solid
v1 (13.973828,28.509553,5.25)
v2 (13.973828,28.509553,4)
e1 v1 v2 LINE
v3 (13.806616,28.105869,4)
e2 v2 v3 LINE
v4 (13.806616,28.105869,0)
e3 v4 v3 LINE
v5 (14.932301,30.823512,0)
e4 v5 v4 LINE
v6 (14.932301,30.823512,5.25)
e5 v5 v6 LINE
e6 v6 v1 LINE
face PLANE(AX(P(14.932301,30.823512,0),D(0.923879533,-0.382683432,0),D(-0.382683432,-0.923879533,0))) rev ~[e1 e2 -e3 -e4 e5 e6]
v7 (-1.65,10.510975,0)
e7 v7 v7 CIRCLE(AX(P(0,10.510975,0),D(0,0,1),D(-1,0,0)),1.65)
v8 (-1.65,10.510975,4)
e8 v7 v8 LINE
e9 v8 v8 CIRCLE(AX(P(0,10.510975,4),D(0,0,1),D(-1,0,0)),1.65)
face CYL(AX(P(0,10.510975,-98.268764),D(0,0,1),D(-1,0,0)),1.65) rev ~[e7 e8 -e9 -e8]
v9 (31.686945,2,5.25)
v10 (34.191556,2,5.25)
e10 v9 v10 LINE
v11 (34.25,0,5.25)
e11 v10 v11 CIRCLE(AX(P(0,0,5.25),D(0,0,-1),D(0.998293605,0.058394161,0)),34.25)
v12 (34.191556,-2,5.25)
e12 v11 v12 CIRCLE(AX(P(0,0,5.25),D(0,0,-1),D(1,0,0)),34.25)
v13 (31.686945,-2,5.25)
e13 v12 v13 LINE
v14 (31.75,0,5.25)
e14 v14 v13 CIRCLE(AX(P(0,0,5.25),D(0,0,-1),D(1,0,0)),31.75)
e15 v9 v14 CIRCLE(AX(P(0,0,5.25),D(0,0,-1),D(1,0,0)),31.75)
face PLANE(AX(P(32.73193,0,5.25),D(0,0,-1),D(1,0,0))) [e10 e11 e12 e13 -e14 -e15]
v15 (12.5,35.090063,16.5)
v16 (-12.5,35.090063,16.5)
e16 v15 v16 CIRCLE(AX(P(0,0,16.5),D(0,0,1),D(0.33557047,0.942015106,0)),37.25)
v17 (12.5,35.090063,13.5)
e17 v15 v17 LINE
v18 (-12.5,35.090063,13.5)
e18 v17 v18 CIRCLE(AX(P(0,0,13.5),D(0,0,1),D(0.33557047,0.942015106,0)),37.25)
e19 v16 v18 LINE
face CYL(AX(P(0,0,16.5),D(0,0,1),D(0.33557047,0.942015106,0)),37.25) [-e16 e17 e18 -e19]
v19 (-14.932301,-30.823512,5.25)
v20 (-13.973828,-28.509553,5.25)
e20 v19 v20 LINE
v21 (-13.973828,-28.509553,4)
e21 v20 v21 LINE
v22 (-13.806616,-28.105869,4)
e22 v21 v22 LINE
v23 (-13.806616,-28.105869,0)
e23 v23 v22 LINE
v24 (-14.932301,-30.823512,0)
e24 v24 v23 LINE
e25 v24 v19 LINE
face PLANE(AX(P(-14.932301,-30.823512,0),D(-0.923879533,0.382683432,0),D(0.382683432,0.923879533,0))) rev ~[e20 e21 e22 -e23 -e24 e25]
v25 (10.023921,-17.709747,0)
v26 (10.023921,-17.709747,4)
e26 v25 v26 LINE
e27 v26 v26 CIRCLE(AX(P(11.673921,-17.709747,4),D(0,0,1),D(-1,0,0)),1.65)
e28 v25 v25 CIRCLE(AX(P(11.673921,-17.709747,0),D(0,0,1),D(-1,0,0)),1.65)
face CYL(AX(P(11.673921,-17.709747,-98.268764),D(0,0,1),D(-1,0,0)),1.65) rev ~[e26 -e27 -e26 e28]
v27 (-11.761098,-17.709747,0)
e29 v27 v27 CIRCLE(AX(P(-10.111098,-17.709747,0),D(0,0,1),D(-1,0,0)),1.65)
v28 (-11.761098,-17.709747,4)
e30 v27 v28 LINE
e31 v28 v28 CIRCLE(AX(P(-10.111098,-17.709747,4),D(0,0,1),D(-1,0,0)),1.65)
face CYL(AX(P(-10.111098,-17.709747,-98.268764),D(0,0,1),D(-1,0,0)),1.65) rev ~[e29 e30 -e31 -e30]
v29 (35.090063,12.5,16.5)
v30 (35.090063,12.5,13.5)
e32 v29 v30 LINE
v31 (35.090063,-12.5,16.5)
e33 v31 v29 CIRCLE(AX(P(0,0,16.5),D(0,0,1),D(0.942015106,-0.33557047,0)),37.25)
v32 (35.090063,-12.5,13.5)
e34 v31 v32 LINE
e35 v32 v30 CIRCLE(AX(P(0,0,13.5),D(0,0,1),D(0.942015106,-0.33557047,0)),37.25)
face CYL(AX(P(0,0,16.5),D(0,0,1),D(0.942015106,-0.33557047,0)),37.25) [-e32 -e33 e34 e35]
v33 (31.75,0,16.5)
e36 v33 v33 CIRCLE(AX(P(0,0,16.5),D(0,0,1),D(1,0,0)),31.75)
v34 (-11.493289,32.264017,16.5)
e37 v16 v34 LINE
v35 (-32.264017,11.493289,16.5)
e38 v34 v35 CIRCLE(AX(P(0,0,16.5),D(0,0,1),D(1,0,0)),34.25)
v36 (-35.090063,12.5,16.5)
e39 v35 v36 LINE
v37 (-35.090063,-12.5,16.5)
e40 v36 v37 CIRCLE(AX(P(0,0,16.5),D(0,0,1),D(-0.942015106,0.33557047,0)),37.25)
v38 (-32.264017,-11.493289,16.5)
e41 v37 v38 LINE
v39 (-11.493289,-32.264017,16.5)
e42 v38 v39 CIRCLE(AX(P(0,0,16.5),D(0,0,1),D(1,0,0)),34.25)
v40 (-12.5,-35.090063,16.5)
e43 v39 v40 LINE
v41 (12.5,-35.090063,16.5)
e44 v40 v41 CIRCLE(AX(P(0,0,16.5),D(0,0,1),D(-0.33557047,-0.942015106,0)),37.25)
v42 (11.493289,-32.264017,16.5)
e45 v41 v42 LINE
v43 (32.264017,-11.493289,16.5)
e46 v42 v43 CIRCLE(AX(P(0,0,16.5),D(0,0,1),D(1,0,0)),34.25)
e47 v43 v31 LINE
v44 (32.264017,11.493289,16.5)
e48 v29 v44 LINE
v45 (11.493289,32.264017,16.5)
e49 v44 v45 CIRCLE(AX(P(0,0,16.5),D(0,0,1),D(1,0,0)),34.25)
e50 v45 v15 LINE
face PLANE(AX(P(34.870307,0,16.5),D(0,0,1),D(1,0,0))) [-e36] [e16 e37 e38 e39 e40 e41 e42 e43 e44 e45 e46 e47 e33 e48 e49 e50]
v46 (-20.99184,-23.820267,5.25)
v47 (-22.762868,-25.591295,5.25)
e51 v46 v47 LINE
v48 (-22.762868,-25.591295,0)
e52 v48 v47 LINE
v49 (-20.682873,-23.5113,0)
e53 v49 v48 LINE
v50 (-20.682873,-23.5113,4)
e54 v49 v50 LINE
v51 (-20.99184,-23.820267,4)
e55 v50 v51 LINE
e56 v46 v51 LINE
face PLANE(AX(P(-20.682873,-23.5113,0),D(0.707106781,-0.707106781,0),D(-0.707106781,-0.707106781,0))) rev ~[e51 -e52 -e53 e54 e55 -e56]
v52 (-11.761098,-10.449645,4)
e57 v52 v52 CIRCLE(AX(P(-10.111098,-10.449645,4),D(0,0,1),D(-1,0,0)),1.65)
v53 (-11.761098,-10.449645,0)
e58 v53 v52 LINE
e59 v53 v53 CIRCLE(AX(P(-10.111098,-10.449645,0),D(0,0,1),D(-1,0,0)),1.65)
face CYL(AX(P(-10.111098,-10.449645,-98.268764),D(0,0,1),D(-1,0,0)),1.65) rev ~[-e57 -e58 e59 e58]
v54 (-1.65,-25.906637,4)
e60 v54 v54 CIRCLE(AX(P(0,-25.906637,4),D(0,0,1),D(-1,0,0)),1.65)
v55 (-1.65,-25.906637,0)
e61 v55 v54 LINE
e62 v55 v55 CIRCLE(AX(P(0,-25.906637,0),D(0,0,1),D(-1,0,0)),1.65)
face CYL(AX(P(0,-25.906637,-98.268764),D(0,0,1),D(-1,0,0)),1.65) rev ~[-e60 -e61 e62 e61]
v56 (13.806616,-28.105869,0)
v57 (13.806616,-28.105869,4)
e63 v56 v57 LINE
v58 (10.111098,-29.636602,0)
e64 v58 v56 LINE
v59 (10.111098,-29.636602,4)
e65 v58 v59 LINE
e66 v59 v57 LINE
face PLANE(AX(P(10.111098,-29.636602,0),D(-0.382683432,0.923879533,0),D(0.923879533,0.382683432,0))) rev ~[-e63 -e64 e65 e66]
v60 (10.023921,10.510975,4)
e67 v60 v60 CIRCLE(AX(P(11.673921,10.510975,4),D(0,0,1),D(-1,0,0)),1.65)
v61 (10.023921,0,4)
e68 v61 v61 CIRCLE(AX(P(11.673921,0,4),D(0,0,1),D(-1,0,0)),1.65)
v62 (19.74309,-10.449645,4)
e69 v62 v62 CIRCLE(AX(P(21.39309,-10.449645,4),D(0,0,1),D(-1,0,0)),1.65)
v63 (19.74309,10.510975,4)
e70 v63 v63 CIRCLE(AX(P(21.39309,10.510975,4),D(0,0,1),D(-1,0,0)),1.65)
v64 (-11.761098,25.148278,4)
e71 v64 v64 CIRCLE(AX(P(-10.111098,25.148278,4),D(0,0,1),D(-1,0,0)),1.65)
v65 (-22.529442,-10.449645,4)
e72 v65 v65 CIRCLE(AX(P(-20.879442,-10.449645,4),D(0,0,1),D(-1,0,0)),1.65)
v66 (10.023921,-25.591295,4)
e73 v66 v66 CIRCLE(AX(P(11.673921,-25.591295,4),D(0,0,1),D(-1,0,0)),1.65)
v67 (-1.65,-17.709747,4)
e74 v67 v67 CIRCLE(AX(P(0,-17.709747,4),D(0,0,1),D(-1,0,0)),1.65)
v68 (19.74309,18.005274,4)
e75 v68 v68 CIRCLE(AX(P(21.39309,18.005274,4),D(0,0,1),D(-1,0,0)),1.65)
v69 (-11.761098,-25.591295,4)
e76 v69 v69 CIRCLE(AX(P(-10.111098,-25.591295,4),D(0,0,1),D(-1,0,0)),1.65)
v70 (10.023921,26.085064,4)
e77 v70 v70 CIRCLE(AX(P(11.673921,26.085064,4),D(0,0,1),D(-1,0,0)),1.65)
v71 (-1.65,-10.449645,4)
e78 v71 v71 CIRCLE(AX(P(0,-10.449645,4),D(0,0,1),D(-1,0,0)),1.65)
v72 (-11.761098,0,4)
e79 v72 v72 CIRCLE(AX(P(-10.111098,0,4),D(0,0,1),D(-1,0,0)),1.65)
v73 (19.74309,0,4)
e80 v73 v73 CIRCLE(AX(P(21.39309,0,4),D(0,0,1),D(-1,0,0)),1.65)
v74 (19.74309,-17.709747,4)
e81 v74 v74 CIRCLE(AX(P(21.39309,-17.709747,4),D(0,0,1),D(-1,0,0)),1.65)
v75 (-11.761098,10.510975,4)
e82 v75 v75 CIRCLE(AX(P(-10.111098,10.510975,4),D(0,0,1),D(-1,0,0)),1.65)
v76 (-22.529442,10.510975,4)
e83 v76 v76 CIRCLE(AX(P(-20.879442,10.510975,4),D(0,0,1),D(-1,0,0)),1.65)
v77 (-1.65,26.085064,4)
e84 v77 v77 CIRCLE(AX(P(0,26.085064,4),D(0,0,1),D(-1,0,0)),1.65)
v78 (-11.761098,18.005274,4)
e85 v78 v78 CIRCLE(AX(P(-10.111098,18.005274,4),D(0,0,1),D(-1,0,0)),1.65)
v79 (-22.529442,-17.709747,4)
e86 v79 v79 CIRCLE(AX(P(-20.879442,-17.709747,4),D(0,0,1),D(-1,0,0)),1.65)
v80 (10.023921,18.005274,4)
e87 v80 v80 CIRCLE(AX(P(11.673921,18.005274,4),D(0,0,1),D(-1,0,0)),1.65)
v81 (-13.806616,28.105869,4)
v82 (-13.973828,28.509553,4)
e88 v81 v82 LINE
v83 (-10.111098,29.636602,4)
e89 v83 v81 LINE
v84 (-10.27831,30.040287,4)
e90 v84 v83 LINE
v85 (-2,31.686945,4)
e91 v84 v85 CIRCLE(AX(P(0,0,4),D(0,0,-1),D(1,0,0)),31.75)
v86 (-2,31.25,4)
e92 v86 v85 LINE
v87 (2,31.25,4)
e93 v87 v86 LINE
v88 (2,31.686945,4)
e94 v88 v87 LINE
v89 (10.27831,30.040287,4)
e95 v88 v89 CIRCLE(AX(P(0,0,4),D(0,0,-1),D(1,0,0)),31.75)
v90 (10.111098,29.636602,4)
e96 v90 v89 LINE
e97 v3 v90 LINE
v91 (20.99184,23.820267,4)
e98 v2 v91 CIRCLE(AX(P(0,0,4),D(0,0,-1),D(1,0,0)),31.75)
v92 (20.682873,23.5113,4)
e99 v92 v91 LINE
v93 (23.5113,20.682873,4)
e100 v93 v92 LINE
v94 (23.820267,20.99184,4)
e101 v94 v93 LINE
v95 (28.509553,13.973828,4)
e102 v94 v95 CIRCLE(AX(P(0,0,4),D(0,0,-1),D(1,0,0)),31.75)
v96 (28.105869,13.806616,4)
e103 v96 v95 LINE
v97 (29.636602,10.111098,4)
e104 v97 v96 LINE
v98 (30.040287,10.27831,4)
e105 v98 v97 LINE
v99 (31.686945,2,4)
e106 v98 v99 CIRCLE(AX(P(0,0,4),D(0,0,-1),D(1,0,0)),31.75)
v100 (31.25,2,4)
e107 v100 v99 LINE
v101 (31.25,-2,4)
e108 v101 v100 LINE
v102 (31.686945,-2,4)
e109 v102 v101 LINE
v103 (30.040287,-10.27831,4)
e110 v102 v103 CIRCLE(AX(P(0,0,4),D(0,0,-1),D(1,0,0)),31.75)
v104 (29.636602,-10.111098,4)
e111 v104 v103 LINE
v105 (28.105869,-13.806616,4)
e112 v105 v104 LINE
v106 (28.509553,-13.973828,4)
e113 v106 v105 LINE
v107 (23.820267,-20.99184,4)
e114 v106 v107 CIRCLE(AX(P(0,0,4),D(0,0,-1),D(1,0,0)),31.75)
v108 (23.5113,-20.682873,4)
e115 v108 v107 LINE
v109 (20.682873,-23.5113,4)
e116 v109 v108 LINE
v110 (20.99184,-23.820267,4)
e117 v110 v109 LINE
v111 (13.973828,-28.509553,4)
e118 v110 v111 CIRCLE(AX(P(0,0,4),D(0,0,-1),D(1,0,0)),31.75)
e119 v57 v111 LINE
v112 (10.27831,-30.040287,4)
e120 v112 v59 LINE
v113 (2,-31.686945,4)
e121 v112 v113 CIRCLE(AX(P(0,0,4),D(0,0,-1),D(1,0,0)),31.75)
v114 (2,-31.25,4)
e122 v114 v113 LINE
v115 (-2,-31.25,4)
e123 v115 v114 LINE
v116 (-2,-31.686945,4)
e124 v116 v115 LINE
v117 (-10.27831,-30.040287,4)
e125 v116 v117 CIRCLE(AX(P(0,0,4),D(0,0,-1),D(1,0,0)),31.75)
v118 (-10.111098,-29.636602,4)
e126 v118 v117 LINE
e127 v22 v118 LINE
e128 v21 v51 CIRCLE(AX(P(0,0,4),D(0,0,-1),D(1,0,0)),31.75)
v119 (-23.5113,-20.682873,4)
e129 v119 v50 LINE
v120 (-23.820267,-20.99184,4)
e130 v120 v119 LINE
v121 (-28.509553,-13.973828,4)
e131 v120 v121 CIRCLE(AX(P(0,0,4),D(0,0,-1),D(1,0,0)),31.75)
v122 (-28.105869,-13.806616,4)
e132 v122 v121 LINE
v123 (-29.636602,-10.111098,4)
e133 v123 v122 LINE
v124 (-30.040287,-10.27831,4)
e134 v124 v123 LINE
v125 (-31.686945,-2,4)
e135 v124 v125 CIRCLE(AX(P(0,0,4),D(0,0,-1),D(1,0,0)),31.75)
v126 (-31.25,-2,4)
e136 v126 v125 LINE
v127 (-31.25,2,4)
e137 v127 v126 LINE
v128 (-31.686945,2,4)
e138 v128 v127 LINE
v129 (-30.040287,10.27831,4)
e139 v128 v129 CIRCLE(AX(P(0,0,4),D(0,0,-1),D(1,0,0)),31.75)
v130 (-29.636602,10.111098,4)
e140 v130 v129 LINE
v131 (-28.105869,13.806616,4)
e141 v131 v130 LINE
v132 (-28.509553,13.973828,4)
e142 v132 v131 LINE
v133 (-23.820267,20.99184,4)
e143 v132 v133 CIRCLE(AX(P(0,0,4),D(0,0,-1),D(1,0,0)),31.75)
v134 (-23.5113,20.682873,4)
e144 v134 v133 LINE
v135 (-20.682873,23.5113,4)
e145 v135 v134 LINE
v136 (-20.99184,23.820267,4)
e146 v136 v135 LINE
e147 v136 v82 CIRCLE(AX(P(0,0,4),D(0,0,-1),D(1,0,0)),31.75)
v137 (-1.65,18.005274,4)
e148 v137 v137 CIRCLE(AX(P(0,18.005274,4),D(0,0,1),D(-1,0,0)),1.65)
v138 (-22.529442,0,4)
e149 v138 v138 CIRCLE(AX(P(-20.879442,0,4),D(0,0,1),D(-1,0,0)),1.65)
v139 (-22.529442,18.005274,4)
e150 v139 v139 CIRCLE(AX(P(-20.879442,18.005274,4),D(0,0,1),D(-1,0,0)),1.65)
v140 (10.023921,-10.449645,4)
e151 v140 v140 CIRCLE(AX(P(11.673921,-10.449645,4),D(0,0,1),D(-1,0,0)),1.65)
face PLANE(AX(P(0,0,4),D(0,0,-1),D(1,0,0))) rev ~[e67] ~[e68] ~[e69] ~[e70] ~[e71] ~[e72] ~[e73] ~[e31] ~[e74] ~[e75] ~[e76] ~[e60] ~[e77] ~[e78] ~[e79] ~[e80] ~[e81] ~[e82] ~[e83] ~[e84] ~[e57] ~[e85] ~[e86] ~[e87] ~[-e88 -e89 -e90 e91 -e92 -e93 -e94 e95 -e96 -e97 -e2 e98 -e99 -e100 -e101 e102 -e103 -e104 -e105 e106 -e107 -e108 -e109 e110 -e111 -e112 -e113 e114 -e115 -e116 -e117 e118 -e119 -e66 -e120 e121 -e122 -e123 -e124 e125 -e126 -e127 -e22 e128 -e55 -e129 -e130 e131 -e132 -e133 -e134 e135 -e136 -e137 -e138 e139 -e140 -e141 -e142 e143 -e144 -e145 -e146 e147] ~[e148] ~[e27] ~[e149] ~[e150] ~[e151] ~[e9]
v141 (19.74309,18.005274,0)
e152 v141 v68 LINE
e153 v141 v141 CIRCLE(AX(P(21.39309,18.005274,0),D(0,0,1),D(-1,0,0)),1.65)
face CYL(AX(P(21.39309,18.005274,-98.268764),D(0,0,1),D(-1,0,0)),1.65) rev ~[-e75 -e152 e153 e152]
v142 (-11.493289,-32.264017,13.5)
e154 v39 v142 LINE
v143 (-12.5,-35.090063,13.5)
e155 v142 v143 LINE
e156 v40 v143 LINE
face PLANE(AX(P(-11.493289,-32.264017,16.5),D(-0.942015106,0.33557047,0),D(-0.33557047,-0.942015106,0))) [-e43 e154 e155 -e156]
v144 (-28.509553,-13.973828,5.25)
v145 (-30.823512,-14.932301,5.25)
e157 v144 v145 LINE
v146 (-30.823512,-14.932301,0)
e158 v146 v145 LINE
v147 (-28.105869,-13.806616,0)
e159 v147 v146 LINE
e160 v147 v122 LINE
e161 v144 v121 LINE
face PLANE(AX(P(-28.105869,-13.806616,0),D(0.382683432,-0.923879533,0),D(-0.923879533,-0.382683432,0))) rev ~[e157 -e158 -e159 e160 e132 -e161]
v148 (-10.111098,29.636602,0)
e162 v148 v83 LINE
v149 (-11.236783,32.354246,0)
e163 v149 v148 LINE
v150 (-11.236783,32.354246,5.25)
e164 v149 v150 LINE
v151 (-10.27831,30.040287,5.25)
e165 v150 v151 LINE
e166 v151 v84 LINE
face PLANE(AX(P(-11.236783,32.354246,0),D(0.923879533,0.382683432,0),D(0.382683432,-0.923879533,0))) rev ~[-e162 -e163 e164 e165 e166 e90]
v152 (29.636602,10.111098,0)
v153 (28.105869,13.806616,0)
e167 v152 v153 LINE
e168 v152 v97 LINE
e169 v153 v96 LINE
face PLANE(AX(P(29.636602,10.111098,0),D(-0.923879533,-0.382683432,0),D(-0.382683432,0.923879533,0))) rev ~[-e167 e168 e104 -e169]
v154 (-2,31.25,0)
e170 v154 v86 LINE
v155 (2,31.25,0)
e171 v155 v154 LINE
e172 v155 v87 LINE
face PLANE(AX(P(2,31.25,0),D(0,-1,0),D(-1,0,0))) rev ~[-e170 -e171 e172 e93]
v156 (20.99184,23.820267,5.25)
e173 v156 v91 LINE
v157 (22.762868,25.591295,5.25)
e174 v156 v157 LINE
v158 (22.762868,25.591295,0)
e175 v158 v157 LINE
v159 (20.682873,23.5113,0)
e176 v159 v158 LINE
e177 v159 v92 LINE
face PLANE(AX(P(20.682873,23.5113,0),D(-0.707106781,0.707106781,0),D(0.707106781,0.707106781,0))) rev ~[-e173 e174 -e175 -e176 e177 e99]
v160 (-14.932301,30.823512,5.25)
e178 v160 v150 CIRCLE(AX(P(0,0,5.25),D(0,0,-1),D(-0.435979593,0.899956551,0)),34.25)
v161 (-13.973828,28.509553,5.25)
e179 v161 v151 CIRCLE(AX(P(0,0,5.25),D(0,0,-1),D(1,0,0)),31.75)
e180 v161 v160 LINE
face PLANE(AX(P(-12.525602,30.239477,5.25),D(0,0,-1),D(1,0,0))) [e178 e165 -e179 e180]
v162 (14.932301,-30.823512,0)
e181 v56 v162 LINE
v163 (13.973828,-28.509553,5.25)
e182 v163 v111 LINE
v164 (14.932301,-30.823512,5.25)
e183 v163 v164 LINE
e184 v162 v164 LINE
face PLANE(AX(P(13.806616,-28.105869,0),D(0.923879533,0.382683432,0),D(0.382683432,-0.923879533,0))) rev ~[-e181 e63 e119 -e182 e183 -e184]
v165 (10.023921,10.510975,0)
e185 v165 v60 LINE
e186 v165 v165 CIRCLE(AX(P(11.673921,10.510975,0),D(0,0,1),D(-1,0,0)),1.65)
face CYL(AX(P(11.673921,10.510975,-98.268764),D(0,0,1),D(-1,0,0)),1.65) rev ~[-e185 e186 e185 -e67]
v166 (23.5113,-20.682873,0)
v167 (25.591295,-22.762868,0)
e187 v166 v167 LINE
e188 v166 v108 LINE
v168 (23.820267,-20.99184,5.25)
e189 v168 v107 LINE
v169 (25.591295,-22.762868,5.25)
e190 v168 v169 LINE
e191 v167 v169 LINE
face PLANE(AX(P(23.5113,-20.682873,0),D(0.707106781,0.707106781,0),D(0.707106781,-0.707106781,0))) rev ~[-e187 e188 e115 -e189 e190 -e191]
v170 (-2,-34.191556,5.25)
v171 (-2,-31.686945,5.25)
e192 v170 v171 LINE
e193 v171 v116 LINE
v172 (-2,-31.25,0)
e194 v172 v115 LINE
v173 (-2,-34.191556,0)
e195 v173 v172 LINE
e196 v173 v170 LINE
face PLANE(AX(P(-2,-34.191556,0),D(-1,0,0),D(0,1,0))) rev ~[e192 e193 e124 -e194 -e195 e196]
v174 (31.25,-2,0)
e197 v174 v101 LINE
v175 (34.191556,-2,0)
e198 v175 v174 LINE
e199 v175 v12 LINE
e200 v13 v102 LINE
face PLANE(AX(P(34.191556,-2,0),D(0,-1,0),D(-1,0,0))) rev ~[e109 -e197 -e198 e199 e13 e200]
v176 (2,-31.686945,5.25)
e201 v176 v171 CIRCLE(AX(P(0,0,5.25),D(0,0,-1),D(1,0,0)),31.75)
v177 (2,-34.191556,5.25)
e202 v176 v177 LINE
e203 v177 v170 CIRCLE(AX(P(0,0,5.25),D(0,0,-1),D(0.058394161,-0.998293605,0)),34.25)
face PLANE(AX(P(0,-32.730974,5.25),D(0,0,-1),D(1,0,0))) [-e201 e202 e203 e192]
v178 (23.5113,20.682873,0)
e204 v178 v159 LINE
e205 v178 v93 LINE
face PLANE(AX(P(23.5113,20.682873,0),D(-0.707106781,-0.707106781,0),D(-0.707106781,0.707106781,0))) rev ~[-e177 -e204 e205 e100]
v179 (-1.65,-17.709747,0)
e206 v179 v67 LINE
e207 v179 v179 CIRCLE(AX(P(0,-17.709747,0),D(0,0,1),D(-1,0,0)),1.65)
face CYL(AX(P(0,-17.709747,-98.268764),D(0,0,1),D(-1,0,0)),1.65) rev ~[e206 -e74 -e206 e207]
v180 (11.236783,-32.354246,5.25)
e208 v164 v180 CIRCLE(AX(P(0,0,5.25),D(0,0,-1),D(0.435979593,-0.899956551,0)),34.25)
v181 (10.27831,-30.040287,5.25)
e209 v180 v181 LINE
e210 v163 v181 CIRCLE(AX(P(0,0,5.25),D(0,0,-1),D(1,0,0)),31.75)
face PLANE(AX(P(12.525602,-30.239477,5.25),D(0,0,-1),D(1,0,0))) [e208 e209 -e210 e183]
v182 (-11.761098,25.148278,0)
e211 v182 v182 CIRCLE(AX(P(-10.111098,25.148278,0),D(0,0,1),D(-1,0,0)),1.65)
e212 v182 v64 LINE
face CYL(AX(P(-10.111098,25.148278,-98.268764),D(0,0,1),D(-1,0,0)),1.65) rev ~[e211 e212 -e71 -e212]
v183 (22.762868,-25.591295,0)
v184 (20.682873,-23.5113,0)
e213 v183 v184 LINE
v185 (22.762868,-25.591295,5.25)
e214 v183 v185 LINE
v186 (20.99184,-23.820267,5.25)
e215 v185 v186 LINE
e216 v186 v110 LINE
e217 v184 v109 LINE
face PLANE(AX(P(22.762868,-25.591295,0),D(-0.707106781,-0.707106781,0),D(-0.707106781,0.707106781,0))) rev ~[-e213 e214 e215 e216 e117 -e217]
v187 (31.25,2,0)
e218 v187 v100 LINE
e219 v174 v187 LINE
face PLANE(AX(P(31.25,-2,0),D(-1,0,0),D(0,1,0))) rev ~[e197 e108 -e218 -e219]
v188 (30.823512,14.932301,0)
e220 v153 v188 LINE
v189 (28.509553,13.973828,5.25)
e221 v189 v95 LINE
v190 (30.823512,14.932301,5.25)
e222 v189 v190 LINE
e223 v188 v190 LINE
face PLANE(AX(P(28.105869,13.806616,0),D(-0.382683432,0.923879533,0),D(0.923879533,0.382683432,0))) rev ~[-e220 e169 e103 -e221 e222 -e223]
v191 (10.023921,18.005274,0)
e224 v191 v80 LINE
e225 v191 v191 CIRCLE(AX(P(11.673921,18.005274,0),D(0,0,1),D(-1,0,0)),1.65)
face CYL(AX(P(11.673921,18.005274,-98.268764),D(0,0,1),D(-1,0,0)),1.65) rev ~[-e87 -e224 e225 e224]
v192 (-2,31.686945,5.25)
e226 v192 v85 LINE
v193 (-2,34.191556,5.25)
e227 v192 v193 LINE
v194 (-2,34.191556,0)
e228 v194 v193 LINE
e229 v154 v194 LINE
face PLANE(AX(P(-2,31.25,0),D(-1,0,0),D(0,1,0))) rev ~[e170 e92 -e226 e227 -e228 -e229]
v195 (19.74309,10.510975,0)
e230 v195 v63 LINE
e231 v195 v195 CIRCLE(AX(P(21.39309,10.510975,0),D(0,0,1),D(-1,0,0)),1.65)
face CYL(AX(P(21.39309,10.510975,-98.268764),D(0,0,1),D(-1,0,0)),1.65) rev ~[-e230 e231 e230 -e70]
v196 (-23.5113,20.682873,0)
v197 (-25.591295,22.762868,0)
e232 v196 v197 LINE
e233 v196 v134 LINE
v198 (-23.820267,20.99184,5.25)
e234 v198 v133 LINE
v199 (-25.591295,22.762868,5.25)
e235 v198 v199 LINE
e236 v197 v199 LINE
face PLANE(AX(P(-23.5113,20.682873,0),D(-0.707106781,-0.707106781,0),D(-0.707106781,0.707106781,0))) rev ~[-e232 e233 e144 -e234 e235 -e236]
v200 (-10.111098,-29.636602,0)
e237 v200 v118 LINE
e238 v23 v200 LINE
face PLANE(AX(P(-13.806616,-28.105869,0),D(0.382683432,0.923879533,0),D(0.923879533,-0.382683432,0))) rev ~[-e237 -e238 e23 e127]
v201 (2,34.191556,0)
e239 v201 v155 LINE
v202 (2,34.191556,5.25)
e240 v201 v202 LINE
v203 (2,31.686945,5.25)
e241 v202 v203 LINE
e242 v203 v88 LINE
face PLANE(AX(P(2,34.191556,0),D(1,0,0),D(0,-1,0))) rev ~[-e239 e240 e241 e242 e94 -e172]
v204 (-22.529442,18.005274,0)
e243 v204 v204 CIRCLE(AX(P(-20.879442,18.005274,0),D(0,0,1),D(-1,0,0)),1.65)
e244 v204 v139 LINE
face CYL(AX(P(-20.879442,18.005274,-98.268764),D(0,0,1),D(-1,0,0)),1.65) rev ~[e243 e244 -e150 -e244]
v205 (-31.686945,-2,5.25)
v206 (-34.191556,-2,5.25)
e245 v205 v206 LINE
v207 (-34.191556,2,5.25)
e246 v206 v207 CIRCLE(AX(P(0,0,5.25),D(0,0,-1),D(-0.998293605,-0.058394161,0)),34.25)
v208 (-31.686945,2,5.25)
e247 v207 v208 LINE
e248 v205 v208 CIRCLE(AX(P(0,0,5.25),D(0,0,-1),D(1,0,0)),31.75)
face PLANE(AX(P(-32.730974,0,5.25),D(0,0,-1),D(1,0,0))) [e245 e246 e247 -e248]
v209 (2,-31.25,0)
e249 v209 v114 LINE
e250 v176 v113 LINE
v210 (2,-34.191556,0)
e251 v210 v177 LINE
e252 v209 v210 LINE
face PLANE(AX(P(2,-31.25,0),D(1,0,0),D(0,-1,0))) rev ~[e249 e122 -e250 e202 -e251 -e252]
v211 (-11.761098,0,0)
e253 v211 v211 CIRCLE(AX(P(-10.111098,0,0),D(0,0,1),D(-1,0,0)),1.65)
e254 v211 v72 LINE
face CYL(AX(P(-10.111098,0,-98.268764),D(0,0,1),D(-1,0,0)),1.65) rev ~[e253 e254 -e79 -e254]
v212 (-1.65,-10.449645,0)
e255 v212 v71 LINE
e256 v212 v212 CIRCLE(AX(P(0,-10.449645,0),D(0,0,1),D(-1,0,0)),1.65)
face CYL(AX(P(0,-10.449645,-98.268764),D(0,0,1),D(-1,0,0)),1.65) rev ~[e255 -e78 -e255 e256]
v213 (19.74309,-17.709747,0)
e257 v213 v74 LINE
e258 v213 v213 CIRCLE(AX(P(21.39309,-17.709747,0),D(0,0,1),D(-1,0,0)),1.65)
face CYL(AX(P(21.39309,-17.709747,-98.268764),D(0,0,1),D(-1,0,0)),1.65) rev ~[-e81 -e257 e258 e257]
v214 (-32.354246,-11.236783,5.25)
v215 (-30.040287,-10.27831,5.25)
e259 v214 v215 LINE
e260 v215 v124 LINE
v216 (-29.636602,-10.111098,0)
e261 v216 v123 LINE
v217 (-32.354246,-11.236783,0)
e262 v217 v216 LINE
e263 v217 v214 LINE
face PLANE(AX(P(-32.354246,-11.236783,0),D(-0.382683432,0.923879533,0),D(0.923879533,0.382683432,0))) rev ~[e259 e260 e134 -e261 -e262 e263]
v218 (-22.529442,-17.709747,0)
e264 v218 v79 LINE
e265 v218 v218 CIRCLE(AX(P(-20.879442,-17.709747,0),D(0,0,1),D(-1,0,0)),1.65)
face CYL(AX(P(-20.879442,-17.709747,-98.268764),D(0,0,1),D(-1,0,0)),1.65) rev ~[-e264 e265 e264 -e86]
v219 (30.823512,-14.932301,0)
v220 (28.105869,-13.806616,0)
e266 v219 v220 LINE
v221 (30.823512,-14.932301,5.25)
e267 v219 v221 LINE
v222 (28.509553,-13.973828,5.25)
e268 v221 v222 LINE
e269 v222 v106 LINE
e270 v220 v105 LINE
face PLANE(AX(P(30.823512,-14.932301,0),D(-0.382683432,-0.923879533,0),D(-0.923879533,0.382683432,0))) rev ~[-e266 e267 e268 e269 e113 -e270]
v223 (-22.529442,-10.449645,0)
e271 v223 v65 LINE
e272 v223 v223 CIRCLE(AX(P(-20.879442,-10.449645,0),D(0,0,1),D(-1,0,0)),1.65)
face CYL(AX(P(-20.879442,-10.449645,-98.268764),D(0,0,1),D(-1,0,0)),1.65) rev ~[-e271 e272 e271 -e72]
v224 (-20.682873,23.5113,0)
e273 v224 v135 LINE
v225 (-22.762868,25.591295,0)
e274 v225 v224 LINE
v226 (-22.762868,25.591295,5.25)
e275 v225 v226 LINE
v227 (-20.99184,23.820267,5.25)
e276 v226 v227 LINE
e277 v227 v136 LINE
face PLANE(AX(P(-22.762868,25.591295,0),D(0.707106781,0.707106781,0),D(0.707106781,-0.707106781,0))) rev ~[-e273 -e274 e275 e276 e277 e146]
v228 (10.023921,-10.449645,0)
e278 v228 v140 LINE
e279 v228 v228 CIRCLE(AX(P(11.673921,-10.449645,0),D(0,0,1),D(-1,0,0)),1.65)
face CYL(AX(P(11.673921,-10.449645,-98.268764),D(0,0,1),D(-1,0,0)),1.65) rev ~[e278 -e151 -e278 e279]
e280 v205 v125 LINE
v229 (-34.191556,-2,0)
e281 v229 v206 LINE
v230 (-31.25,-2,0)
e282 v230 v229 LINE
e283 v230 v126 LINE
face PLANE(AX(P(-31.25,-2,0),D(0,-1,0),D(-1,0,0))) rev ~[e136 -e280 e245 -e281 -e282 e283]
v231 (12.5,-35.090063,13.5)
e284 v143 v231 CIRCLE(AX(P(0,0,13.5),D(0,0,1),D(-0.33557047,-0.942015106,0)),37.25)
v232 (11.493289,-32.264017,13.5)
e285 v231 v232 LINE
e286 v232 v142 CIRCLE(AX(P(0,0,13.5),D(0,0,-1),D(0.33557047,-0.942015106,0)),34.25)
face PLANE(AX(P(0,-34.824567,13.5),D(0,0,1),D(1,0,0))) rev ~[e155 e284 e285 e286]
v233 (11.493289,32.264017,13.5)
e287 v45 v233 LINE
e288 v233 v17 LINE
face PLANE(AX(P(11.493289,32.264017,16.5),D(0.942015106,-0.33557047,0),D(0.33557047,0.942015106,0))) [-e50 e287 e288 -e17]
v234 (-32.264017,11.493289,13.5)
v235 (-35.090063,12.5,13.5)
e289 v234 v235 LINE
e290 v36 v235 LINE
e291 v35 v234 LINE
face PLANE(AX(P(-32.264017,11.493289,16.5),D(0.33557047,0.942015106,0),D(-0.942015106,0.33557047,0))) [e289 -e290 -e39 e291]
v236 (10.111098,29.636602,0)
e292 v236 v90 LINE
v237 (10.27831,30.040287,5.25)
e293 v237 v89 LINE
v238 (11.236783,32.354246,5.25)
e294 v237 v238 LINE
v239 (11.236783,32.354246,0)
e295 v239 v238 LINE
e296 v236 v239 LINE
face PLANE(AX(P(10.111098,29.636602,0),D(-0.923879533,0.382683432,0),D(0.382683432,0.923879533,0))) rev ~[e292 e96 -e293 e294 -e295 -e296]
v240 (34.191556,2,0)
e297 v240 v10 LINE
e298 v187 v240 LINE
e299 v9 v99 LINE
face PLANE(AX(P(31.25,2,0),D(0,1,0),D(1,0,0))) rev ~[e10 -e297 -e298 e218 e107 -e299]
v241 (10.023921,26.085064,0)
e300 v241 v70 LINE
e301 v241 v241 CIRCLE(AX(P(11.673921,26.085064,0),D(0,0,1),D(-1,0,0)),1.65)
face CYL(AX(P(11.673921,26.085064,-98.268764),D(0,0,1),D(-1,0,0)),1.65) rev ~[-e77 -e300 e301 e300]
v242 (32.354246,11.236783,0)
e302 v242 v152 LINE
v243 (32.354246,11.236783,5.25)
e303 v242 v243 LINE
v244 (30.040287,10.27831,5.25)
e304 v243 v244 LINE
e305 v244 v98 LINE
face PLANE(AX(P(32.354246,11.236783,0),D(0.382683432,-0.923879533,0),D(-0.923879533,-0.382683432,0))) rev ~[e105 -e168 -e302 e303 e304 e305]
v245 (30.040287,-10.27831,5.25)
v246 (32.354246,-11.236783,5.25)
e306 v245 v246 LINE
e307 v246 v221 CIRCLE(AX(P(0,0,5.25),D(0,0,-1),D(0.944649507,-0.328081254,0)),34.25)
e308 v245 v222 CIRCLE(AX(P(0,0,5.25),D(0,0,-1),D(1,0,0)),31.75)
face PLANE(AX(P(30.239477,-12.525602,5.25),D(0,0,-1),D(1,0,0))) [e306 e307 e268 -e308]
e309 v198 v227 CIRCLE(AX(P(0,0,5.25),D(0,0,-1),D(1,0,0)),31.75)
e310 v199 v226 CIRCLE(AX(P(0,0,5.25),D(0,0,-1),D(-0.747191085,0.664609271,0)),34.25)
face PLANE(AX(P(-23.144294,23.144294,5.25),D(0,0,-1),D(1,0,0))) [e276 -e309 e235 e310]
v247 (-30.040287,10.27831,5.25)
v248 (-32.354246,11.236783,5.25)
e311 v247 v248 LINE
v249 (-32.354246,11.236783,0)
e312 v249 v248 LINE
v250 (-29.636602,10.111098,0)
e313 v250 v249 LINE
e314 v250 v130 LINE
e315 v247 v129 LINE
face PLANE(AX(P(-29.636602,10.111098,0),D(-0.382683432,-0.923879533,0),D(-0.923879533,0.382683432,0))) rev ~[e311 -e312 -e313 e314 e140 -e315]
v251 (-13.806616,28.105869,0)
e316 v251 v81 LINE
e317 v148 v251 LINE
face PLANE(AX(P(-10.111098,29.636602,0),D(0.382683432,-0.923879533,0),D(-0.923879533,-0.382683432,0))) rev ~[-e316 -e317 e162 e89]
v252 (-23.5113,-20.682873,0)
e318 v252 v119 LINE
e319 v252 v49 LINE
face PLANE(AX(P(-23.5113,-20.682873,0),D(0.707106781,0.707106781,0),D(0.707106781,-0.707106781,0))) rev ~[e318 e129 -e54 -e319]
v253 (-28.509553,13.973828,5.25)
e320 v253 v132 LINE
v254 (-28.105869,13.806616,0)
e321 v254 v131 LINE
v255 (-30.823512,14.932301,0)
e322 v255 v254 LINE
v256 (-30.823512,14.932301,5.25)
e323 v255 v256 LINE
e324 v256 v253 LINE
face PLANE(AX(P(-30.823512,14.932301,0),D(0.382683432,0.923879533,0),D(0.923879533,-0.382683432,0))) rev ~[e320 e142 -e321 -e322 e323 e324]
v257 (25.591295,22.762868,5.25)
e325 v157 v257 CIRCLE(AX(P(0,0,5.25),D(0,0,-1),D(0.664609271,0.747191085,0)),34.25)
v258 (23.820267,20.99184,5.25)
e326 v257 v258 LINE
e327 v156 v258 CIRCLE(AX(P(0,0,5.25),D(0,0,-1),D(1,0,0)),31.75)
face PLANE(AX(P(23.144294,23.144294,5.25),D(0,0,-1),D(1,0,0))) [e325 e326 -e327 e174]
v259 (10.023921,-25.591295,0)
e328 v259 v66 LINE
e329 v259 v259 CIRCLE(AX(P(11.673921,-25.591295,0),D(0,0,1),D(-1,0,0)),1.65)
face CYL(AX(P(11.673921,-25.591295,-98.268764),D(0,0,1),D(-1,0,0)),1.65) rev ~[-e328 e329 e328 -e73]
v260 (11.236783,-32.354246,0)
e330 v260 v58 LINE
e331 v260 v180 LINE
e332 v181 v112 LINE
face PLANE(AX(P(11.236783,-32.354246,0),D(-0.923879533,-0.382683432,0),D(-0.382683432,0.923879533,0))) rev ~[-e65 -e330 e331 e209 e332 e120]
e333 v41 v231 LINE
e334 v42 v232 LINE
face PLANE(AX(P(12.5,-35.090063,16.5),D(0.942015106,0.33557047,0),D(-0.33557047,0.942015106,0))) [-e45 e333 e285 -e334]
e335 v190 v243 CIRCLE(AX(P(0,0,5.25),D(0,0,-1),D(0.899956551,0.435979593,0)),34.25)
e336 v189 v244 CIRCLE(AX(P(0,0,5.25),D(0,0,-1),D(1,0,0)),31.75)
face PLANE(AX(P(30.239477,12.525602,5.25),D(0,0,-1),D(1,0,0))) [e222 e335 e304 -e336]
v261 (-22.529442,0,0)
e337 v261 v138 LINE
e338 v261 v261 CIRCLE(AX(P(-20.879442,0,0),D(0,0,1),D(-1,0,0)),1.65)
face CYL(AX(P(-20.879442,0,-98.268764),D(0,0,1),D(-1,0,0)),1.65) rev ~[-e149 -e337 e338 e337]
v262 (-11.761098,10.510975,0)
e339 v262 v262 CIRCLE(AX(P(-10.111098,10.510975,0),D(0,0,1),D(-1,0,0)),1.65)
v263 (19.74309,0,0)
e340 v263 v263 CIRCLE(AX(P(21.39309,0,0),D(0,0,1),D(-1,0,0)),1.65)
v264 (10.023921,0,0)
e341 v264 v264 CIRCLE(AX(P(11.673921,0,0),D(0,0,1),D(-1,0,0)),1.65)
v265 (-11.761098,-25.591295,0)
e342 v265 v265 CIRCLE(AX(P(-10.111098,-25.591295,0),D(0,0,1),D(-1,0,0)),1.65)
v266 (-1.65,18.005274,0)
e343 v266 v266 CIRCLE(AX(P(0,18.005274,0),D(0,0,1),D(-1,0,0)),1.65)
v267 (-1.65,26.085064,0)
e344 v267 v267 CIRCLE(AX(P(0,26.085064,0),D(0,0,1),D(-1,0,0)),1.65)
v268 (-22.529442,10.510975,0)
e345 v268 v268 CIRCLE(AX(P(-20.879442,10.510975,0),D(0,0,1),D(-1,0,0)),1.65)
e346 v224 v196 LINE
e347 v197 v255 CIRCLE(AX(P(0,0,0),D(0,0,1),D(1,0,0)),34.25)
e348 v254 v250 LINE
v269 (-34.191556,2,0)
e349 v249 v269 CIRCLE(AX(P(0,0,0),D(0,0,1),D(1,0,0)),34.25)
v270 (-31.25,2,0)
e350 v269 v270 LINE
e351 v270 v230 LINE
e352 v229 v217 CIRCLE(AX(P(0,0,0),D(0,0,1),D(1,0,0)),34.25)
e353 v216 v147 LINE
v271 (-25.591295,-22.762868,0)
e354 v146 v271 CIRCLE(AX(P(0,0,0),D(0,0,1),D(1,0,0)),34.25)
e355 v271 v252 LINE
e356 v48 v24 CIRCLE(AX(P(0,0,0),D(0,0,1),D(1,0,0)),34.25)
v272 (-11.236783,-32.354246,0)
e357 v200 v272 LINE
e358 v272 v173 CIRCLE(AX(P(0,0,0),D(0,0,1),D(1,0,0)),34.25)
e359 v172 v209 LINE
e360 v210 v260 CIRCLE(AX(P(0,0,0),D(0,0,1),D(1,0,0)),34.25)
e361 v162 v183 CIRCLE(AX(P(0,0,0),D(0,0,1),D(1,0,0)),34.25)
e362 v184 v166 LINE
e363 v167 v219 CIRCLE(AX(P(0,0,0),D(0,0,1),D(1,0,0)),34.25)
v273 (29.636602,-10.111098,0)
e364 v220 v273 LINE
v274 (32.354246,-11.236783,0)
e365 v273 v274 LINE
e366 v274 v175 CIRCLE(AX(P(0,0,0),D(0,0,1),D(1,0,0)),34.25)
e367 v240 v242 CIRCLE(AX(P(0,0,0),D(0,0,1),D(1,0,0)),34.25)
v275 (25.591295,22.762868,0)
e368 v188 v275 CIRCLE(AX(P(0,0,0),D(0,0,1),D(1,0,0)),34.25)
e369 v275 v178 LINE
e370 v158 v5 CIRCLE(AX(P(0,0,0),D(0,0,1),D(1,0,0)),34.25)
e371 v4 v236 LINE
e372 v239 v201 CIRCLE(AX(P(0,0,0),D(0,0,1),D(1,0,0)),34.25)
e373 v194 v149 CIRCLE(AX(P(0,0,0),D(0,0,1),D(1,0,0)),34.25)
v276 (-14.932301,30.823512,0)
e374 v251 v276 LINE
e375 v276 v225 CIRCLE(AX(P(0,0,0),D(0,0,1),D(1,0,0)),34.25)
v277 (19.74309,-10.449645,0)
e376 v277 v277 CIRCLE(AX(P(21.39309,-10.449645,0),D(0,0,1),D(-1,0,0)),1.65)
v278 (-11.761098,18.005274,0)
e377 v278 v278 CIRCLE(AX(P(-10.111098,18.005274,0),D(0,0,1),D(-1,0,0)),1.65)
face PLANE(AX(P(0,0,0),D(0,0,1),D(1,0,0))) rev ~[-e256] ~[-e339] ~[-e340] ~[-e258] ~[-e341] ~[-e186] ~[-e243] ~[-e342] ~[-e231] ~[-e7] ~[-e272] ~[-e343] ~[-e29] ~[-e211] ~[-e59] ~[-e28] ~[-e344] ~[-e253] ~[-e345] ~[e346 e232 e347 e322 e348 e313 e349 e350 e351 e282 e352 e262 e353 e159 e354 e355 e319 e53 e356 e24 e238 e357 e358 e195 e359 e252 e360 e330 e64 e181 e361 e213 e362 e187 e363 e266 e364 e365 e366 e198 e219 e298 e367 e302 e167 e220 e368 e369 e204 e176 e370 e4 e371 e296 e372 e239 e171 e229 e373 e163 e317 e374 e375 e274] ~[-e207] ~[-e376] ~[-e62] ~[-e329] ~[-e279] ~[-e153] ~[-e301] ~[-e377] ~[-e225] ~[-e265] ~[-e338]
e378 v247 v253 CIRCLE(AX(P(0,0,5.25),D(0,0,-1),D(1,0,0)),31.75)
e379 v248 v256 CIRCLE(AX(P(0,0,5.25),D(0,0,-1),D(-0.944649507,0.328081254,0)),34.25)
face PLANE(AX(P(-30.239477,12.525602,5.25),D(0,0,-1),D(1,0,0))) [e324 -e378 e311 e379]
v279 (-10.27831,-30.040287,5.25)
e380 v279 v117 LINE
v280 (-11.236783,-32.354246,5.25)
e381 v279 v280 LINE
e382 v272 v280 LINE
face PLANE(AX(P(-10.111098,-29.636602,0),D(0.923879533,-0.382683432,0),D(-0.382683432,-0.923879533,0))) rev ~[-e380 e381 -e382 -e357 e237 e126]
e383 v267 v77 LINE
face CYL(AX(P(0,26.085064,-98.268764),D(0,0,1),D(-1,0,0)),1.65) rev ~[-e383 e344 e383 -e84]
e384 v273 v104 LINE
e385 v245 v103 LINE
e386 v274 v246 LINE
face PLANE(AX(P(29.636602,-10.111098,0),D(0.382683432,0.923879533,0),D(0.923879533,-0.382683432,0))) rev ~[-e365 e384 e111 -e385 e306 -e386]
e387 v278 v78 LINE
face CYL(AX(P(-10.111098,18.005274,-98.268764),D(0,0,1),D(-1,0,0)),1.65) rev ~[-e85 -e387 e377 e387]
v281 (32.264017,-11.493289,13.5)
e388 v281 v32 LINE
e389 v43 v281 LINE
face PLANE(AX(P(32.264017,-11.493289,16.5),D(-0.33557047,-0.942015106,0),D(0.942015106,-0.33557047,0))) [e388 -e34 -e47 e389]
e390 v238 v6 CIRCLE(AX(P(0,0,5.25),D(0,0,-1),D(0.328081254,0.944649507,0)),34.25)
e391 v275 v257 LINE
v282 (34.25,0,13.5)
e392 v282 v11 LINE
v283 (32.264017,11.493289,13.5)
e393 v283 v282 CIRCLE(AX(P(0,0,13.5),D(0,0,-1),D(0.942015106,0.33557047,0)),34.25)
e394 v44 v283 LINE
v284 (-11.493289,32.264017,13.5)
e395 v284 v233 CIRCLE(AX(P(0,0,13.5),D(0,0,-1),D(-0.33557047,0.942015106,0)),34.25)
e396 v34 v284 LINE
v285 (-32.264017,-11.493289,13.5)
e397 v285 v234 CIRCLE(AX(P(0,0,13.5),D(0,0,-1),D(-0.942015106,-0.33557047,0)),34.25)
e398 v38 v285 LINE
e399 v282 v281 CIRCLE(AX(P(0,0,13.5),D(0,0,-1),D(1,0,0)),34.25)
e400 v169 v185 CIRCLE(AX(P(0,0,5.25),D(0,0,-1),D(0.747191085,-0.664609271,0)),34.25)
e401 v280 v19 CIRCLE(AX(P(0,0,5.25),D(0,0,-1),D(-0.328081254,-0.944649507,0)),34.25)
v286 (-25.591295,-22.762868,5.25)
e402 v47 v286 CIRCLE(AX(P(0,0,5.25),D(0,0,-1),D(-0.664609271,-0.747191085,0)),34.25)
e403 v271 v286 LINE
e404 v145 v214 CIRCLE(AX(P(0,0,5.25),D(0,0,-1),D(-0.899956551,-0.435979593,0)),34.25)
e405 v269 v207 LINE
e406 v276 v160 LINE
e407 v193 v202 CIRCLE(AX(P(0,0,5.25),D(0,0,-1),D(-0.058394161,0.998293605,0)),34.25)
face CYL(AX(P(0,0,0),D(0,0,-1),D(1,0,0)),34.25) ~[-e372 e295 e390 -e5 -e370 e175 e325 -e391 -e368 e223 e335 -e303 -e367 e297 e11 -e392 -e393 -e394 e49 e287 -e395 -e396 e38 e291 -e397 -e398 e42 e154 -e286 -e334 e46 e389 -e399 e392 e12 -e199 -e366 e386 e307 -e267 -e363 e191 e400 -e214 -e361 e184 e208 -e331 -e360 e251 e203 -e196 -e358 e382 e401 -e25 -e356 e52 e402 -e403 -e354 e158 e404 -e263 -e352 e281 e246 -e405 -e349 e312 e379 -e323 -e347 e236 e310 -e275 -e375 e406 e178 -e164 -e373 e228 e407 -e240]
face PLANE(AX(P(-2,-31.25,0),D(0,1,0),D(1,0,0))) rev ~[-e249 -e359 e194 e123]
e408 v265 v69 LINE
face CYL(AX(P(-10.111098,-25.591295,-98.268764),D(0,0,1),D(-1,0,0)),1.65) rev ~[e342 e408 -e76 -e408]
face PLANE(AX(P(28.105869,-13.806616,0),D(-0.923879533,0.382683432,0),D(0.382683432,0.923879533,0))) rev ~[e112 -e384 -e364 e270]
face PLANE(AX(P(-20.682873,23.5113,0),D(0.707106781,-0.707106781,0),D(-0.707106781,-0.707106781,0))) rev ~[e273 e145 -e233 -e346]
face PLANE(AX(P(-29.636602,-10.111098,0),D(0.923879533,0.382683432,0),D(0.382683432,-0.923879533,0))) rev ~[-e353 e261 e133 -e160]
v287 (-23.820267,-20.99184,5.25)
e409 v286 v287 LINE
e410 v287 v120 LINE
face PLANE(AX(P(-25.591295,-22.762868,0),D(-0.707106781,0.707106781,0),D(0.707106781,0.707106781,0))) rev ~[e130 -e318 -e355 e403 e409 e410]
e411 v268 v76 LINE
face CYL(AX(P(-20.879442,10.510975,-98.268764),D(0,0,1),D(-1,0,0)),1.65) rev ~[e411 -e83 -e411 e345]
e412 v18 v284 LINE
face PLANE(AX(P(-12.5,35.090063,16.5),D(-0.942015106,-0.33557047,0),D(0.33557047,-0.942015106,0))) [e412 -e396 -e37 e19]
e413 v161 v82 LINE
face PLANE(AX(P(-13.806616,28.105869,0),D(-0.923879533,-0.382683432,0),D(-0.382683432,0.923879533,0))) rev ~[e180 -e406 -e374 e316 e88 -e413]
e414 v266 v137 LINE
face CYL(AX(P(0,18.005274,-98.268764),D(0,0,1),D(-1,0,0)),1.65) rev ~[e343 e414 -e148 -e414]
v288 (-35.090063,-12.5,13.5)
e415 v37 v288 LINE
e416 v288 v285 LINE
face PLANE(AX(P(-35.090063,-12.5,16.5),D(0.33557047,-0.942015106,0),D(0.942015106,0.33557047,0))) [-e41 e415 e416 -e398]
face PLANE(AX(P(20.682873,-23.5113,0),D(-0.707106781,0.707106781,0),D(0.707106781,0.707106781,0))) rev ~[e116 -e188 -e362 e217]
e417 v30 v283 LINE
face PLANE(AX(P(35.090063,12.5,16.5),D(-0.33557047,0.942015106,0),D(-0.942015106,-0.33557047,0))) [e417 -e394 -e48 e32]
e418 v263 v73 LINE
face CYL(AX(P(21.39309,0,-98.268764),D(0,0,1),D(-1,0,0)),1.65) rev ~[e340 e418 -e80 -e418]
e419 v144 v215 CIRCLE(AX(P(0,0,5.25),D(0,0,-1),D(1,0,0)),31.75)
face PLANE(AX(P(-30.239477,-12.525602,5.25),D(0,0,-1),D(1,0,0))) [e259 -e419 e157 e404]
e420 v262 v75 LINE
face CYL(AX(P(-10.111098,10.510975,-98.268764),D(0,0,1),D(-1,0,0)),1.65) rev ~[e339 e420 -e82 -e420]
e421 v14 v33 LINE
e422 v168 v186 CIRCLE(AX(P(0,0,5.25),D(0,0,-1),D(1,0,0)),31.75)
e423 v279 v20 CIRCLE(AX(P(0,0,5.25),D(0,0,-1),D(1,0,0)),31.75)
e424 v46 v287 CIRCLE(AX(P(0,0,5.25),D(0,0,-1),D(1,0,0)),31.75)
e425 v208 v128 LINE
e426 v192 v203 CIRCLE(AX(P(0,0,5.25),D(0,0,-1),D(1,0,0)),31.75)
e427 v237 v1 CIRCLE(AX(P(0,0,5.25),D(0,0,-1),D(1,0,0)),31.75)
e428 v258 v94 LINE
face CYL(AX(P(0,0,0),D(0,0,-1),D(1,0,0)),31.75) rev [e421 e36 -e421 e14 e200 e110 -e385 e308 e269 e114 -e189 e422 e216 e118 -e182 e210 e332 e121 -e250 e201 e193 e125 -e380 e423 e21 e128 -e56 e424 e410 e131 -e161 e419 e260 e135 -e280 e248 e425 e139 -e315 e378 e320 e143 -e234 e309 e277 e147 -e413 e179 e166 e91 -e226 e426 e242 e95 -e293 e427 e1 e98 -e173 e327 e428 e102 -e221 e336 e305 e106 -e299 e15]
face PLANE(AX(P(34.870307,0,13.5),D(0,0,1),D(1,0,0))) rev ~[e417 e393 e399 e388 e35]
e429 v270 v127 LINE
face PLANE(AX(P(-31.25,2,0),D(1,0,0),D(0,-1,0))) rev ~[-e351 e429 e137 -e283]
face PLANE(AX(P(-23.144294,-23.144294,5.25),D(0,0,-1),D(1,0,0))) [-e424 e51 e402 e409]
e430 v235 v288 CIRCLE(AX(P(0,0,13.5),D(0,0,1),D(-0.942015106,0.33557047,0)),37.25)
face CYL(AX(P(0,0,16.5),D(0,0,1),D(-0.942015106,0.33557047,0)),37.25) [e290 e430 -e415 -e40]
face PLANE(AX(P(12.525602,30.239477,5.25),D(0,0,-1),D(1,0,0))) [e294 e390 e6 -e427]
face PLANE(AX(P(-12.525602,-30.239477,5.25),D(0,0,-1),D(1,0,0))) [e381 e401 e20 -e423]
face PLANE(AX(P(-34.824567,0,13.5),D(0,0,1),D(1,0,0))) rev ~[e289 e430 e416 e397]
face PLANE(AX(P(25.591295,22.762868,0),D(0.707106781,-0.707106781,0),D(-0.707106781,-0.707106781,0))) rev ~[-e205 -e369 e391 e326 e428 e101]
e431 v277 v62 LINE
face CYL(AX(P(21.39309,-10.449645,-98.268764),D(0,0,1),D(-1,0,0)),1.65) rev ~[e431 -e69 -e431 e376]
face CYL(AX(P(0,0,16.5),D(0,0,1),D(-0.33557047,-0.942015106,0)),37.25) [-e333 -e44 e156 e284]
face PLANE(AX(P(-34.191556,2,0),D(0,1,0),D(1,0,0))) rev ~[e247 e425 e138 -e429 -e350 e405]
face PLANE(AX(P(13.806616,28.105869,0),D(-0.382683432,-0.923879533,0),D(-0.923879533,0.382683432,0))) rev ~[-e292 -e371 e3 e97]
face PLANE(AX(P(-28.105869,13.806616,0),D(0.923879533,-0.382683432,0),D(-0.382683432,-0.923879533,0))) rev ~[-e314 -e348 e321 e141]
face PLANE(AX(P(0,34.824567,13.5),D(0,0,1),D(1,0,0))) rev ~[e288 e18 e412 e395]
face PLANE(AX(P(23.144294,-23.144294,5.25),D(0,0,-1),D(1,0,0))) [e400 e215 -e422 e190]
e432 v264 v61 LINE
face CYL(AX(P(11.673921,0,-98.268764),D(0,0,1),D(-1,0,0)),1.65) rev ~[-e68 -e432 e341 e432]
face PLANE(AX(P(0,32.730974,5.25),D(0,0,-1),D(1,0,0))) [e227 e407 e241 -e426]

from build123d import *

# Parameters (mm, degrees)
F0_R     = 34.25
F0_R_2   = 31.75
F1_DEPTH = 16.5
F2_R     = 34.25
F2_R_2   = 31.75
F3_DEPTH = 4
F5_DEPTH = 5.25
F7_D     = 3.3
F9_DEPTH = 3


with BuildPart() as f1:
    # F0 (on Top) → F1 (new body)
    with BuildSketch(Plane.XY):
        Circle(F0_R)
        Circle(F0_R_2, mode=Mode.SUBTRACT)
    extrude(amount=F1_DEPTH)

    # F2 (on face) → F3 (join)
    with BuildSketch(Plane(origin=(0, 0, 0), x_dir=(1, 0, 0), z_dir=(0, 0, -1))):
        Circle(F2_R)
        Circle(F2_R_2, mode=Mode.SUBTRACT)
        Circle(F2_R_2)
    extrude(amount=-F3_DEPTH)

    # F4 (on face) → F5 (cut)
    with BuildSketch(Plane(origin=(0, 0, 0), x_dir=(1, 0, 0), z_dir=(0, 0, -1))):
        with BuildLine():
            ThreePointArc((25.5912946517, 22.762867527), (24.2184072556, 24.2184072556), (22.762867527, 25.5912946517))
            Line((22.762867527, 25.5912946517), (20.6828733497, 23.5113004745))
            Line((20.6828733497, 23.5113004745), (23.5113004745, 20.6828733497))
            Line((23.5113004745, 20.6828733497), (25.5912946517, 22.762867527))
        make_face()
        with BuildLine():
            ThreePointArc((14.9323010635, 30.8235118854), (13.1069075585, 31.6428739885), (11.2367829334, 32.3542456149))
            Line((11.2367829334, 32.3542456149), (10.1110981964, 29.6366022557))
            Line((10.1110981964, 29.6366022557), (13.8066163264, 28.1058685262))
            Line((13.8066163264, 28.1058685262), (14.9323010635, 30.8235118854))
        make_face()
        with BuildLine():
            ThreePointArc((2, 34.1915559751), (0, 34.25), (-2, 34.1915559751))
            Line((-2, 34.1915559751), (-2, 31.25))
            Line((-2, 31.25), (2, 31.25))
            Line((2, 31.25), (2, 34.1915559751))
        make_face()
        with BuildLine():
            Line((-10.1110981964, 29.6366022557), (-11.2367829334, 32.3542456149))
            ThreePointArc((-11.2367829334, 32.3542456149), (-13.1069075585, 31.6428739885), (-14.9323010635, 30.8235118854))
            Line((-14.9323010635, 30.8235118854), (-13.8066163264, 28.1058685262))
            Line((-13.8066163264, 28.1058685262), (-10.1110981964, 29.6366022557))
        make_face()
        with BuildLine():
            Line((-20.6828733497, 23.5113004745), (-22.762867527, 25.5912946517))
            ThreePointArc((-22.762867527, 25.5912946517), (-24.2184072556, 24.2184072556), (-25.5912946517, 22.762867527))
            Line((-25.5912946517, 22.762867527), (-23.5113004745, 20.6828733497))
            Line((-23.5113004745, 20.6828733497), (-20.6828733497, 23.5113004745))
        make_face()
        with BuildLine():
            Line((-31.25, 2), (-34.1915559751, 2))
            ThreePointArc((-34.1915559751, 2), (-34.25, 0), (-34.1915559751, -2))
            Line((-34.1915559751, -2), (-31.25, -2))
            Line((-31.25, -2), (-31.25, 2))
        make_face()
        with BuildLine():
            Line((-29.6366022557, -10.1110981964), (-32.3542456149, -11.2367829334))
            ThreePointArc((-32.3542456149, -11.2367829334), (-31.6428739885, -13.1069075585), (-30.8235118854, -14.9323010635))
            Line((-30.8235118854, -14.9323010635), (-28.1058685262, -13.8066163264))
            Line((-28.1058685262, -13.8066163264), (-29.6366022557, -10.1110981964))
        make_face()
        with BuildLine():
            Line((-23.5113004745, -20.6828733497), (-25.5912946517, -22.762867527))
            ThreePointArc((-25.5912946517, -22.762867527), (-24.2184072556, -24.2184072556), (-22.762867527, -25.5912946517))
            Line((-22.762867527, -25.5912946517), (-20.6828733497, -23.5113004745))
            Line((-20.6828733497, -23.5113004745), (-23.5113004745, -20.6828733497))
        make_face()
        with BuildLine():
            Line((-13.8066163264, -28.1058685262), (-14.9323010635, -30.8235118854))
            ThreePointArc((-14.9323010635, -30.8235118854), (-13.1069075585, -31.6428739885), (-11.2367829334, -32.3542456149))
            Line((-11.2367829334, -32.3542456149), (-10.1110981964, -29.6366022557))
            Line((-10.1110981964, -29.6366022557), (-13.8066163264, -28.1058685262))
        make_face()
        with BuildLine():
            Line((-2, -31.25), (-2, -34.1915559751))
            ThreePointArc((-2, -34.1915559751), (0, -34.25), (2, -34.1915559751))
            Line((2, -34.1915559751), (2, -31.25))
            Line((2, -31.25), (-2, -31.25))
        make_face()
        with BuildLine():
            ThreePointArc((11.2367829334, -32.3542456149), (13.1069075585, -31.6428739885), (14.9323010635, -30.8235118854))
            Line((14.9323010635, -30.8235118854), (13.8066163264, -28.1058685262))
            Line((13.8066163264, -28.1058685262), (10.1110981964, -29.6366022557))
            Line((10.1110981964, -29.6366022557), (11.2367829334, -32.3542456149))
        make_face()
        with BuildLine():
            ThreePointArc((30.8235118854, -14.9323010635), (31.6428739885, -13.1069075585), (32.3542456149, -11.2367829334))
            Line((32.3542456149, -11.2367829334), (29.6366022557, -10.1110981964))
            Line((29.6366022557, -10.1110981964), (28.1058685262, -13.8066163264))
            Line((28.1058685262, -13.8066163264), (30.8235118854, -14.9323010635))
        make_face()
        with BuildLine():
            ThreePointArc((22.762867527, -25.5912946517), (24.2184072556, -24.2184072556), (25.5912946517, -22.762867527))
            Line((25.5912946517, -22.762867527), (23.5113004745, -20.6828733497))
            Line((23.5113004745, -20.6828733497), (20.6828733497, -23.5113004745))
            Line((20.6828733497, -23.5113004745), (22.762867527, -25.5912946517))
        make_face()
        with BuildLine():
            ThreePointArc((34.25, 0), (34.2353858759, 1.0004268719), (34.1915559751, 2))
            Line((34.1915559751, 2), (31.25, 2))
            Line((31.25, 2), (31.25, -2))
            Line((31.25, -2), (34.1915559751, -2))
            ThreePointArc((34.1915559751, -2), (34.2353858759, -1.0004268719), (34.25, 0))
        make_face()
        with BuildLine():
            ThreePointArc((32.3542456149, 11.2367829334), (31.6428739885, 13.1069075585), (30.8235118854, 14.9323010635))
            Line((30.8235118854, 14.9323010635), (28.1058685262, 13.8066163264))
            Line((28.1058685262, 13.8066163264), (29.6366022557, 10.1110981964))
            Line((29.6366022557, 10.1110981964), (32.3542456149, 11.2367829334))
        make_face()
        with BuildLine():
            Line((-28.1058685262, 13.8066163264), (-30.8235118854, 14.9323010635))
            ThreePointArc((-30.8235118854, 14.9323010635), (-31.6428739885, 13.1069075585), (-32.3542456149, 11.2367829334))
            Line((-32.3542456149, 11.2367829334), (-29.6366022557, 10.1110981964))
            Line((-29.6366022557, 10.1110981964), (-28.1058685262, 13.8066163264))
        make_face()
    extrude(amount=-F5_DEPTH, mode=Mode.SUBTRACT)

    # F7 (through all)
    with Locations(Plane(origin=(0, 0, 0), x_dir=(1, 0, 0), z_dir=(0, 0, -1))):
        with Locations((-10.1110981964, 0), (-10.1110981964, 10.4496451095), (-10.1110981964, 17.7097469568), (-20.8794418722, 17.7097469568), (-20.8794418722, 10.4496451095), (-20.8794418722, 0), (-20.8794418722, -10.5109745637), (-20.8794418722, -18.0052742362), (-10.1110981964, -25.1482781023), (-10.1110981964, -18.0052742362), (-10.1110981964, -10.5109745637), (0, -18.0052742362), (0, -10.5109745637), (0, -26.0850638151), (0, 10.4496451095), (0, 17.7097469568), (-10.1110981964, 25.5912946517), (11.6739207879, 25.5912946517), (0, 25.906637311), (11.6739207879, 17.7097469568), (11.6739207879, 10.4496451095), (11.6739207879, 0), (11.6739207879, -10.5109745637), (11.6739207879, -26.0850638151), (21.3930904865, -18.0052742362), (11.6739207879, -18.0052742362), (21.3930904865, -10.5109745637), (21.3930904865, 0), (21.3930904865, 10.4496451095), (21.3930904865, 17.7097469568)):
            Hole(F7_D / 2)

    # F8 (on face) → F9 (join)
    with BuildSketch(Plane.XY.offset(16.5)):
        with BuildLine():
            ThreePointArc((-32.2640173781, -11.4932885906), (-34.25, 0), (-32.2640173781, 11.4932885906))
            Line((-32.2640173781, 11.4932885906), (-35.0900626959, 12.5))
            ThreePointArc((-35.0900626959, 12.5), (-37.25, 0), (-35.0900626959, -12.5))
            Line((-35.0900626959, -12.5), (-32.2640173781, -11.4932885906))
        make_face()
        with BuildLine():
            Line((11.4932885906, 32.2640173781), (12.5, 35.0900626959))
            ThreePointArc((12.5, 35.0900626959), (0, 37.25), (-12.5, 35.0900626959))
            Line((-12.5, 35.0900626959), (-11.4932885906, 32.2640173781))
            ThreePointArc((-11.4932885906, 32.2640173781), (0, 34.25), (11.4932885906, 32.2640173781))
        make_face()
        with BuildLine():
            Line((35.0900626959, 12.5), (32.2640173781, 11.4932885906))
            ThreePointArc((32.2640173781, 11.4932885906), (33.7498525567, 5.8318052437), (34.25, 0))
            ThreePointArc((34.25, 0), (33.7498525567, -5.8318052437), (32.2640173781, -11.4932885906))
            Line((32.2640173781, -11.4932885906), (35.0900626959, -12.5))
            ThreePointArc((35.0900626959, -12.5), (37.25, 0), (35.0900626959, 12.5))
        make_face()
        with BuildLine():
            ThreePointArc((11.4932885906, -32.2640173781), (0, -34.25), (-11.4932885906, -32.2640173781))
            Line((-11.4932885906, -32.2640173781), (-12.5, -35.0900626959))
            ThreePointArc((-12.5, -35.0900626959), (0, -37.25), (12.5, -35.0900626959))
            Line((12.5, -35.0900626959), (11.4932885906, -32.2640173781))
        make_face()
    extrude(amount=-F9_DEPTH)


solid = f1.part
